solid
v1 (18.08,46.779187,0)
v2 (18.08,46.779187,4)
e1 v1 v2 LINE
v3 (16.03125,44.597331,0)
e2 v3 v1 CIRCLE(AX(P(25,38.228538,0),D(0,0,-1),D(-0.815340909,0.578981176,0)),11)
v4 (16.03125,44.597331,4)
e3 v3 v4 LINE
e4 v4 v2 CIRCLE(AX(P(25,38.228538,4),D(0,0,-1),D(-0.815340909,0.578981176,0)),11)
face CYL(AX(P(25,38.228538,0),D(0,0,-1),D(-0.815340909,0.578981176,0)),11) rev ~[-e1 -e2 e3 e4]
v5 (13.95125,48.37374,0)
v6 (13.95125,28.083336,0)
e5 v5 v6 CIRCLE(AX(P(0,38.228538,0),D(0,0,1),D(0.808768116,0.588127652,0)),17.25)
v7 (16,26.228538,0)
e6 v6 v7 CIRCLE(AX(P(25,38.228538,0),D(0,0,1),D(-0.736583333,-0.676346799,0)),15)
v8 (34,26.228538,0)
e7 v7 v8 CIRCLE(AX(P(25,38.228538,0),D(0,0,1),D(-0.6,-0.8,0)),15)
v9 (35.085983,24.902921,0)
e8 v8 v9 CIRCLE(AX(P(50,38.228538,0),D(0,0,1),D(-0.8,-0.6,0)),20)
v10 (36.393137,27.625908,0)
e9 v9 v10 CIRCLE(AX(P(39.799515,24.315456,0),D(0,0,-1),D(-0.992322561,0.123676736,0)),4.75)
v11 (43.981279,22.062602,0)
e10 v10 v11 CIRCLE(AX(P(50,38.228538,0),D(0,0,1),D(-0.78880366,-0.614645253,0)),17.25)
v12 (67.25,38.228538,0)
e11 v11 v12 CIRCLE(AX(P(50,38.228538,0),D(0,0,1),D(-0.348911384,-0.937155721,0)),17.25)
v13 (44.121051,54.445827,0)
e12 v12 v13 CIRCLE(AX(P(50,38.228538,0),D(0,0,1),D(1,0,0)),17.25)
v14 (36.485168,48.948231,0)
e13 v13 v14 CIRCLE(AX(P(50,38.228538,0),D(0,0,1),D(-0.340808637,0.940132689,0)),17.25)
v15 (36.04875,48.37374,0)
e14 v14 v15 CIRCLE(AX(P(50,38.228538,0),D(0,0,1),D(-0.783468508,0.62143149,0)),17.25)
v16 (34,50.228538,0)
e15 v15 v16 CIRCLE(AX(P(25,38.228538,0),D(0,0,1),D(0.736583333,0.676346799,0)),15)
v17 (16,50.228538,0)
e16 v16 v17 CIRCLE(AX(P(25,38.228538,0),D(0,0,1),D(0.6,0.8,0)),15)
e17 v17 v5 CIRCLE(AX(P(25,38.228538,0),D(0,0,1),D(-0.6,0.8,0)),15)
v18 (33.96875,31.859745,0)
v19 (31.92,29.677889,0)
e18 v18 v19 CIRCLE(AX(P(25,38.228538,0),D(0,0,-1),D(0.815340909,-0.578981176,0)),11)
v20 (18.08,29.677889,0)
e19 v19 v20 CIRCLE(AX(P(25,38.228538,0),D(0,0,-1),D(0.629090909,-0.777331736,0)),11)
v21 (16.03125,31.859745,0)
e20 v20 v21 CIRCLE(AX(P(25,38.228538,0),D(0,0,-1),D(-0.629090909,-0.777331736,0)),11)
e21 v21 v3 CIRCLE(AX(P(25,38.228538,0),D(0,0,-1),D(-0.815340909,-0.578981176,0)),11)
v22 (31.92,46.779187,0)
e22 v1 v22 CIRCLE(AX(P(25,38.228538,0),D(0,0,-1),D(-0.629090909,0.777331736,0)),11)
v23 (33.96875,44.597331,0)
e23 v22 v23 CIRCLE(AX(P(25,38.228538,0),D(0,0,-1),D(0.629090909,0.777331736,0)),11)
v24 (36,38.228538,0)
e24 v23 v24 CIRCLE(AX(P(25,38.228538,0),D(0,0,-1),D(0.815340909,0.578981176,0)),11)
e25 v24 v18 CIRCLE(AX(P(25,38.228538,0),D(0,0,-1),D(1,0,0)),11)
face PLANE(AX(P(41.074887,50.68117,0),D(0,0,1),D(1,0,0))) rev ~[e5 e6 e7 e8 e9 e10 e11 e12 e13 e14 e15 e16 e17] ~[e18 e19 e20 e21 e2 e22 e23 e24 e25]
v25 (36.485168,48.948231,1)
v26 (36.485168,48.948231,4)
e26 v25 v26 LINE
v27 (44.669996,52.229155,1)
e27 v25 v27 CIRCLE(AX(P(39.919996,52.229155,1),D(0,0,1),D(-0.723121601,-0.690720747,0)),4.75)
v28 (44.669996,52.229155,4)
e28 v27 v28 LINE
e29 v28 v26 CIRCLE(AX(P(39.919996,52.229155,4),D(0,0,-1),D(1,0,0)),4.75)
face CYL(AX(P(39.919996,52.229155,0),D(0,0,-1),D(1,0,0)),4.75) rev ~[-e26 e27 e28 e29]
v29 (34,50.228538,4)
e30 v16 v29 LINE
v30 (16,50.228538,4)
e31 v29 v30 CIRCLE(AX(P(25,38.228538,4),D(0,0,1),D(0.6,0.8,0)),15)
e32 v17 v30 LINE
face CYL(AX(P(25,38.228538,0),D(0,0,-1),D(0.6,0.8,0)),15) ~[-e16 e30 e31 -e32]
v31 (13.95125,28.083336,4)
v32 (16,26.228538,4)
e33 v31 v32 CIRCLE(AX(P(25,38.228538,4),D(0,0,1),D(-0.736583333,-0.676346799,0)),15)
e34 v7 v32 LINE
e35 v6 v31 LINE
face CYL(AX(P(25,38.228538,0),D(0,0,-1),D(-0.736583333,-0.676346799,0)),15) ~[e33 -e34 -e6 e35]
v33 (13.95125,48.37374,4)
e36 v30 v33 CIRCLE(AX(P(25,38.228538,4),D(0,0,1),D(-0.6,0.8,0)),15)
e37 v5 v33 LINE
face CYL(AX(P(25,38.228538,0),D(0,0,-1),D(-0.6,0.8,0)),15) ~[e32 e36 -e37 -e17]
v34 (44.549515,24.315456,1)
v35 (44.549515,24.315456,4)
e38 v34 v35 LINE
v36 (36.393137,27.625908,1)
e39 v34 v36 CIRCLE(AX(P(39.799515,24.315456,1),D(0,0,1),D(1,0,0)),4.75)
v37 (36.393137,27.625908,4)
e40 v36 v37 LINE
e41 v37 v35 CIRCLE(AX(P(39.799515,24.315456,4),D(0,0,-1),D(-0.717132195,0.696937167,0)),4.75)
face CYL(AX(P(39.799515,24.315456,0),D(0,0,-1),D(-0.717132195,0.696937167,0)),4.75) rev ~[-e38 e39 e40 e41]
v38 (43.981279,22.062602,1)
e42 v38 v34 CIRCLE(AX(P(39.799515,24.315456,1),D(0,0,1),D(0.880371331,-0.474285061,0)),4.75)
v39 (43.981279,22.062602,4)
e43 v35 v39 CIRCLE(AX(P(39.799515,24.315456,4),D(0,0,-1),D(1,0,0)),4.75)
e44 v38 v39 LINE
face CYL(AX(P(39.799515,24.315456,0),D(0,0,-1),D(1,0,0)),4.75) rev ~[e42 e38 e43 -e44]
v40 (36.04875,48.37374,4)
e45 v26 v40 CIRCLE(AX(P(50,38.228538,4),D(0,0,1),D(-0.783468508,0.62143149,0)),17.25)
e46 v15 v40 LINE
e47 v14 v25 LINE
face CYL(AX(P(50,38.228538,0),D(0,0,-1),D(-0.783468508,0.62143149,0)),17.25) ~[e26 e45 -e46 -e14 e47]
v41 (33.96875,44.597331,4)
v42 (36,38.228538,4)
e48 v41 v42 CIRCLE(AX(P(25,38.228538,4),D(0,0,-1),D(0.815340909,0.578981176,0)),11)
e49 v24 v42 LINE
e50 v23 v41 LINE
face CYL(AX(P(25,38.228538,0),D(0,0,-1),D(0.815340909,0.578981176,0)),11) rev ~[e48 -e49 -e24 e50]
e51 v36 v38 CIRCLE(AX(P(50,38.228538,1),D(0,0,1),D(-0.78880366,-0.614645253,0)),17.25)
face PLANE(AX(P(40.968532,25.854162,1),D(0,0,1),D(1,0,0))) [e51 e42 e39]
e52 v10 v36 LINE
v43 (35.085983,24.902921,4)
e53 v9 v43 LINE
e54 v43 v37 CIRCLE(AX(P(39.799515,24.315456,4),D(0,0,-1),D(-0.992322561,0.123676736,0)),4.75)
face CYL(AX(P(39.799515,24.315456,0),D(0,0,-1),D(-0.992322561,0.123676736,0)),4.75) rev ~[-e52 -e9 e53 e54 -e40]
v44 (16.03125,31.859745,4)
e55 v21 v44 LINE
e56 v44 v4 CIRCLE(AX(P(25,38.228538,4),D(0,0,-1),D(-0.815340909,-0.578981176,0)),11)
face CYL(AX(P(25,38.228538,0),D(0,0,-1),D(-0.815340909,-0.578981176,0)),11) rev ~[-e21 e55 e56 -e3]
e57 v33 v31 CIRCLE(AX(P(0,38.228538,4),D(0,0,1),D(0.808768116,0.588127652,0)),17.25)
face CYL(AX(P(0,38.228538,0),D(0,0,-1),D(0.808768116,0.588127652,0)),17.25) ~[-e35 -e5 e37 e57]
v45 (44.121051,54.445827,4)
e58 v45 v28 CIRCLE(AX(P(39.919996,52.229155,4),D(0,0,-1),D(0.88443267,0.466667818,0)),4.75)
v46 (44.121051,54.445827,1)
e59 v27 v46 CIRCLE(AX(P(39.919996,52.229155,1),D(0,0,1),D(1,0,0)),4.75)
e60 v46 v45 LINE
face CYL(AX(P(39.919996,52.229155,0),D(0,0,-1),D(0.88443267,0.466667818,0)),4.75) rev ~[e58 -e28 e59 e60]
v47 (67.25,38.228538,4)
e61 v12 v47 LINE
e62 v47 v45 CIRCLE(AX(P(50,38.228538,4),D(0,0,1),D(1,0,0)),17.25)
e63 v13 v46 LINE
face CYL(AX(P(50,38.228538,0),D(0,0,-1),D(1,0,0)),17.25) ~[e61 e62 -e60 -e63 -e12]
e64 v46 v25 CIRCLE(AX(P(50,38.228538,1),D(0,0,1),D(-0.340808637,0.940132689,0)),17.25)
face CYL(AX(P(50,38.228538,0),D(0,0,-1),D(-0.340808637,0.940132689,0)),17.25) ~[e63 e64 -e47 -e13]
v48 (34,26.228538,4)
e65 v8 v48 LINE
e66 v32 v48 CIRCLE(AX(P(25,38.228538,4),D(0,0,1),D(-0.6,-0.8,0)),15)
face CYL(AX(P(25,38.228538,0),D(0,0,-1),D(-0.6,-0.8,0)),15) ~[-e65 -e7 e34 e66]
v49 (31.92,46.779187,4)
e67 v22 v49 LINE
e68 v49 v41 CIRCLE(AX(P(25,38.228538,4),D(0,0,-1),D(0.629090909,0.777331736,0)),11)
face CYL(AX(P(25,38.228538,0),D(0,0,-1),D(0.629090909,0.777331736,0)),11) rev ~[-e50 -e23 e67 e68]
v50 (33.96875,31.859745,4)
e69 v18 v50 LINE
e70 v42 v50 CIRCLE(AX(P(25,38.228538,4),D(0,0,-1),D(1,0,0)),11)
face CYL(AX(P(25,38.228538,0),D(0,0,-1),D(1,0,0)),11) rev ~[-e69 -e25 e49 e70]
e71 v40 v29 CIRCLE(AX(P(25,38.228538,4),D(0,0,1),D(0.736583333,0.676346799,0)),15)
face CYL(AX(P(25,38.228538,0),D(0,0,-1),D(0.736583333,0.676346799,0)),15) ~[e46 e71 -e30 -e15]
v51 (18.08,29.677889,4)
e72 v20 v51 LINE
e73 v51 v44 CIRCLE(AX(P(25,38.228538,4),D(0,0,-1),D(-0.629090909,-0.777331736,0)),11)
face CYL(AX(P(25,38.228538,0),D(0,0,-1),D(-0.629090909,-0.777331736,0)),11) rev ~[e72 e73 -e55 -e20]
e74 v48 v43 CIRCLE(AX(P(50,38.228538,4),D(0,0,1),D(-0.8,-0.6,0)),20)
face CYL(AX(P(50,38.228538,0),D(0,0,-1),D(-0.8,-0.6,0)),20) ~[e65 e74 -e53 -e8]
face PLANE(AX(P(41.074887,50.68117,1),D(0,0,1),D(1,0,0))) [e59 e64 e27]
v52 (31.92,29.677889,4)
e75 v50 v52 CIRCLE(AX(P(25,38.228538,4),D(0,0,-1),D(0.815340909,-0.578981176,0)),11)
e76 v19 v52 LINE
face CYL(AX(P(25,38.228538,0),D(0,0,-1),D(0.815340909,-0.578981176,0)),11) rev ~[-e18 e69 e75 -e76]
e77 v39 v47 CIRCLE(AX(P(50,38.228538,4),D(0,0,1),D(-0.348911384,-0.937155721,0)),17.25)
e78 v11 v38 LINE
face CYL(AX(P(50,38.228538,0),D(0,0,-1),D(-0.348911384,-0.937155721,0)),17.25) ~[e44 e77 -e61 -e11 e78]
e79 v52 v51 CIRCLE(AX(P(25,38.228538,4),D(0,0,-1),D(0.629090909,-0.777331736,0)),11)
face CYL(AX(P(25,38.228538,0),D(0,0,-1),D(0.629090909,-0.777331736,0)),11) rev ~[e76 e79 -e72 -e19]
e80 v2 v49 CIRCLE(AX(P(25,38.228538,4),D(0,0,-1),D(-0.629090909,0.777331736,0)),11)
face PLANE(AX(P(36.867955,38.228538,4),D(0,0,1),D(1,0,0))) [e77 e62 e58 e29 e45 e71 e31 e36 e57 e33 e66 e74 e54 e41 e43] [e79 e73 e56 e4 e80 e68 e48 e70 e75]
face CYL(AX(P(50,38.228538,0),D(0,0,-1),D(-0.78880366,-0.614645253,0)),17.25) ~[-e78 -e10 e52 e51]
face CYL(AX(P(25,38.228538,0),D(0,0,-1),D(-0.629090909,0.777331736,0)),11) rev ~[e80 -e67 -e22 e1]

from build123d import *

# Parameters (mm, degrees)
F1_DEPTH = 4
F2_DEPTH = 1


# Not quite as in the source:
# - a feature names something its author has since deleted; it is built from what else it names


with BuildPart() as f1:
    # F0 (on Top) → F1 (new body)
    with BuildSketch(Plane.XY):
        with BuildLine():
            ThreePointArc((33.96875, 44.5973311111), (35.4798914594, 41.5709736662), (36, 38.228538177))
            ThreePointArc((36, 38.228538177), (35.4798914594, 34.8861026877), (33.96875, 31.8597452428))
            ThreePointArc((33.96875, 31.8597452428), (34.890304672, 29.9063024739), (36.04875, 28.083336186))
            ThreePointArc((36.04875, 28.083336186), (38.9773253879, 32.7847917648), (40, 38.228538177))
            ThreePointArc((40, 38.228538177), (38.9773253879, 43.6722845891), (36.04875, 48.3737401679))
            ThreePointArc((36.04875, 48.3737401679), (34.890304672, 46.55077388), (33.96875, 44.5973311111))
        make_face()
        with BuildLine():
            ThreePointArc((31.92, 46.7791872751), (33.0189287452, 45.7582647177), (33.96875, 44.5973311111))
            ThreePointArc((33.96875, 44.5973311111), (34.890304672, 46.55077388), (36.04875, 48.3737401679))
            ThreePointArc((36.04875, 48.3737401679), (35.0671824784, 49.3484229311), (34, 50.228538177))
            ThreePointArc((34, 50.228538177), (32.8729423014, 48.5563595633), (31.92, 46.7791872751))
        make_face()
        with BuildLine():
            ThreePointArc((36.04875, 28.083336186), (34.890304672, 29.9063024739), (33.96875, 31.8597452428))
            ThreePointArc((33.96875, 31.8597452428), (33.0189287452, 30.6988116362), (31.92, 29.6778890788))
            ThreePointArc((31.92, 29.6778890788), (32.8729423014, 27.9007167906), (34, 26.228538177))
            ThreePointArc((34, 26.228538177), (35.0671824784, 27.1086534228), (36.04875, 28.083336186))
        make_face()
        with BuildLine():
            ThreePointArc((18.08, 46.7791872751), (25, 49.228538177), (31.92, 46.7791872751))
            ThreePointArc((31.92, 46.7791872751), (32.8729423014, 48.5563595633), (34, 50.228538177))
            ThreePointArc((34, 50.228538177), (25, 53.228538177), (16, 50.228538177))
            ThreePointArc((16, 50.228538177), (17.1270576986, 48.5563595633), (18.08, 46.7791872751))
        make_face()
        with BuildLine():
            ThreePointArc((36.4851682331, 48.9482313775), (36.2639553749, 48.6632675964), (36.04875, 48.3737401679))
            ThreePointArc((36.04875, 48.3737401679), (38.9773253879, 43.6722845891), (40, 38.228538177))
            ThreePointArc((40, 38.228538177), (38.9773253879, 32.7847917648), (36.04875, 28.083336186))
            ThreePointArc((36.04875, 28.083336186), (36.2190453875, 27.853192883), (36.3931368718, 27.6259075689))
            ThreePointArc((36.3931368718, 27.6259075689), (41.5858805009, 28.7167510128), (44.5495147975, 24.3154560246))
            ThreePointArc((44.5495147975, 24.3154560246), (44.4052654508, 23.1537499865), (43.9812786211, 22.062601985))
            ThreePointArc((43.9812786211, 22.062601985), (59.8422445665, 24.0619323063), (67.25, 38.228538177))
            ThreePointArc((67.25, 38.228538177), (59.9032981891, 52.3525314146), (44.1210510171, 54.4458270643))
            ThreePointArc((44.1210510171, 54.4458270643), (44.5307176941, 53.3709710002), (44.6699958357, 52.2291549274))
            ThreePointArc((44.6699958357, 52.2291549274), (41.6873482182, 47.8201907003), (36.4851682331, 48.9482313775))
        make_face()
        with BuildLine():
            ThreePointArc((50, 45.978538177), (55.4800775542, 43.7086157311), (57.75, 38.228538177))
            ThreePointArc((57.75, 38.228538177), (44.5199224458, 32.7484606228), (50, 45.978538177))
        make_face(mode=Mode.SUBTRACT)
        with BuildLine():
            ThreePointArc((34, 26.228538177), (32.8729423014, 27.9007167906), (31.92, 29.6778890788))
            ThreePointArc((31.92, 29.6778890788), (25, 27.228538177), (18.08, 29.6778890788))
            ThreePointArc((18.08, 29.6778890788), (17.1270576986, 27.9007167906), (16, 26.228538177))
            ThreePointArc((16, 26.228538177), (25, 23.228538177), (34, 26.228538177))
        make_face()
        with BuildLine():
            ThreePointArc((36.3931368718, 27.6259075689), (36.2190453875, 27.853192883), (36.04875, 28.083336186))
            ThreePointArc((36.04875, 28.083336186), (35.0671824784, 27.1086534228), (34, 26.228538177))
            ThreePointArc((34, 26.228538177), (34.528786958, 25.5540927449), (35.0859826327, 24.9029205189))
            ThreePointArc((35.0859826327, 24.9029205189), (35.517354176, 26.3710825501), (36.3931368718, 27.6259075689))
        make_face()
        with BuildLine():
            ThreePointArc((16.03125, 44.5973311111), (16.9810712548, 45.7582647177), (18.08, 46.7791872751))
            ThreePointArc((18.08, 46.7791872751), (17.1270576986, 48.5563595633), (16, 50.228538177))
            ThreePointArc((16, 50.228538177), (14.9328175216, 49.3484229311), (13.95125, 48.3737401679))
            ThreePointArc((13.95125, 48.3737401679), (15.109695328, 46.55077388), (16.03125, 44.5973311111))
        make_face()
        with BuildLine():
            ThreePointArc((16, 26.228538177), (17.1270576986, 27.9007167906), (18.08, 29.6778890788))
            ThreePointArc((18.08, 29.6778890788), (16.9810712548, 30.6988116362), (16.03125, 31.8597452428))
            ThreePointArc((16.03125, 31.8597452428), (15.109695328, 29.9063024739), (13.95125, 28.083336186))
            ThreePointArc((13.95125, 28.083336186), (14.9328175216, 27.1086534228), (16, 26.228538177))
        make_face()
        with BuildLine():
            ThreePointArc((16.03125, 31.8597452428), (14, 38.228538177), (16.03125, 44.5973311111))
            ThreePointArc((16.03125, 44.5973311111), (15.109695328, 46.55077388), (13.95125, 48.3737401679))
            ThreePointArc((13.95125, 48.3737401679), (10, 38.228538177), (13.95125, 28.083336186))
            ThreePointArc((13.95125, 28.083336186), (15.109695328, 29.9063024739), (16.03125, 31.8597452428))
        make_face()
        with BuildLine():
            ThreePointArc((13.95125, 28.083336186), (10, 38.228538177), (13.95125, 48.3737401679))
            ThreePointArc((13.95125, 48.3737401679), (-17.25, 38.228538177), (13.95125, 28.083336186))
        make_face()
        with BuildLine():
            ThreePointArc((0, 45.978538177), (5.4800775542, 43.7086157311), (7.75, 38.228538177))
            ThreePointArc((7.75, 38.228538177), (-5.4800775542, 32.7484606228), (0, 45.978538177))
        make_face(mode=Mode.SUBTRACT)
        with BuildLine():
            ThreePointArc((0, 45.978538177), (-5.4800775542, 32.7484606228), (7.75, 38.228538177))
            ThreePointArc((7.75, 38.228538177), (5.4800775542, 43.7086157311), (0, 45.978538177))
        make_face()
        with BuildLine():
            ThreePointArc((50, 45.978538177), (44.5199224458, 32.7484606228), (57.75, 38.228538177))
            ThreePointArc((57.75, 38.228538177), (55.4800775542, 43.7086157311), (50, 45.978538177))
        make_face()
    extrude(amount=F1_DEPTH)

    # F0 (on Top) → F2 (join)
    with BuildSketch(Plane.XY):
        with BuildLine():
            ThreePointArc((44.1210510171, 54.4458270643), (39.9210331617, 52.2277141339), (36.4851682331, 48.9482313775))
            ThreePointArc((36.4851682331, 48.9482313775), (41.6873482182, 47.8201907003), (44.6699958357, 52.2291549274))
            ThreePointArc((44.6699958357, 52.2291549274), (44.5307176941, 53.3709710002), (44.1210510171, 54.4458270643))
        make_face()
        with BuildLine():
            ThreePointArc((44.5495147975, 24.3154560246), (41.5858805009, 28.7167510128), (36.3931368718, 27.6259075689))
            ThreePointArc((36.3931368718, 27.6259075689), (39.8005645222, 24.31688781), (43.9812786211, 22.062601985))
            ThreePointArc((43.9812786211, 22.062601985), (44.4052654508, 23.1537499865), (44.5495147975, 24.3154560246))
        make_face()
    extrude(amount=F2_DEPTH)


solid = f1.part
